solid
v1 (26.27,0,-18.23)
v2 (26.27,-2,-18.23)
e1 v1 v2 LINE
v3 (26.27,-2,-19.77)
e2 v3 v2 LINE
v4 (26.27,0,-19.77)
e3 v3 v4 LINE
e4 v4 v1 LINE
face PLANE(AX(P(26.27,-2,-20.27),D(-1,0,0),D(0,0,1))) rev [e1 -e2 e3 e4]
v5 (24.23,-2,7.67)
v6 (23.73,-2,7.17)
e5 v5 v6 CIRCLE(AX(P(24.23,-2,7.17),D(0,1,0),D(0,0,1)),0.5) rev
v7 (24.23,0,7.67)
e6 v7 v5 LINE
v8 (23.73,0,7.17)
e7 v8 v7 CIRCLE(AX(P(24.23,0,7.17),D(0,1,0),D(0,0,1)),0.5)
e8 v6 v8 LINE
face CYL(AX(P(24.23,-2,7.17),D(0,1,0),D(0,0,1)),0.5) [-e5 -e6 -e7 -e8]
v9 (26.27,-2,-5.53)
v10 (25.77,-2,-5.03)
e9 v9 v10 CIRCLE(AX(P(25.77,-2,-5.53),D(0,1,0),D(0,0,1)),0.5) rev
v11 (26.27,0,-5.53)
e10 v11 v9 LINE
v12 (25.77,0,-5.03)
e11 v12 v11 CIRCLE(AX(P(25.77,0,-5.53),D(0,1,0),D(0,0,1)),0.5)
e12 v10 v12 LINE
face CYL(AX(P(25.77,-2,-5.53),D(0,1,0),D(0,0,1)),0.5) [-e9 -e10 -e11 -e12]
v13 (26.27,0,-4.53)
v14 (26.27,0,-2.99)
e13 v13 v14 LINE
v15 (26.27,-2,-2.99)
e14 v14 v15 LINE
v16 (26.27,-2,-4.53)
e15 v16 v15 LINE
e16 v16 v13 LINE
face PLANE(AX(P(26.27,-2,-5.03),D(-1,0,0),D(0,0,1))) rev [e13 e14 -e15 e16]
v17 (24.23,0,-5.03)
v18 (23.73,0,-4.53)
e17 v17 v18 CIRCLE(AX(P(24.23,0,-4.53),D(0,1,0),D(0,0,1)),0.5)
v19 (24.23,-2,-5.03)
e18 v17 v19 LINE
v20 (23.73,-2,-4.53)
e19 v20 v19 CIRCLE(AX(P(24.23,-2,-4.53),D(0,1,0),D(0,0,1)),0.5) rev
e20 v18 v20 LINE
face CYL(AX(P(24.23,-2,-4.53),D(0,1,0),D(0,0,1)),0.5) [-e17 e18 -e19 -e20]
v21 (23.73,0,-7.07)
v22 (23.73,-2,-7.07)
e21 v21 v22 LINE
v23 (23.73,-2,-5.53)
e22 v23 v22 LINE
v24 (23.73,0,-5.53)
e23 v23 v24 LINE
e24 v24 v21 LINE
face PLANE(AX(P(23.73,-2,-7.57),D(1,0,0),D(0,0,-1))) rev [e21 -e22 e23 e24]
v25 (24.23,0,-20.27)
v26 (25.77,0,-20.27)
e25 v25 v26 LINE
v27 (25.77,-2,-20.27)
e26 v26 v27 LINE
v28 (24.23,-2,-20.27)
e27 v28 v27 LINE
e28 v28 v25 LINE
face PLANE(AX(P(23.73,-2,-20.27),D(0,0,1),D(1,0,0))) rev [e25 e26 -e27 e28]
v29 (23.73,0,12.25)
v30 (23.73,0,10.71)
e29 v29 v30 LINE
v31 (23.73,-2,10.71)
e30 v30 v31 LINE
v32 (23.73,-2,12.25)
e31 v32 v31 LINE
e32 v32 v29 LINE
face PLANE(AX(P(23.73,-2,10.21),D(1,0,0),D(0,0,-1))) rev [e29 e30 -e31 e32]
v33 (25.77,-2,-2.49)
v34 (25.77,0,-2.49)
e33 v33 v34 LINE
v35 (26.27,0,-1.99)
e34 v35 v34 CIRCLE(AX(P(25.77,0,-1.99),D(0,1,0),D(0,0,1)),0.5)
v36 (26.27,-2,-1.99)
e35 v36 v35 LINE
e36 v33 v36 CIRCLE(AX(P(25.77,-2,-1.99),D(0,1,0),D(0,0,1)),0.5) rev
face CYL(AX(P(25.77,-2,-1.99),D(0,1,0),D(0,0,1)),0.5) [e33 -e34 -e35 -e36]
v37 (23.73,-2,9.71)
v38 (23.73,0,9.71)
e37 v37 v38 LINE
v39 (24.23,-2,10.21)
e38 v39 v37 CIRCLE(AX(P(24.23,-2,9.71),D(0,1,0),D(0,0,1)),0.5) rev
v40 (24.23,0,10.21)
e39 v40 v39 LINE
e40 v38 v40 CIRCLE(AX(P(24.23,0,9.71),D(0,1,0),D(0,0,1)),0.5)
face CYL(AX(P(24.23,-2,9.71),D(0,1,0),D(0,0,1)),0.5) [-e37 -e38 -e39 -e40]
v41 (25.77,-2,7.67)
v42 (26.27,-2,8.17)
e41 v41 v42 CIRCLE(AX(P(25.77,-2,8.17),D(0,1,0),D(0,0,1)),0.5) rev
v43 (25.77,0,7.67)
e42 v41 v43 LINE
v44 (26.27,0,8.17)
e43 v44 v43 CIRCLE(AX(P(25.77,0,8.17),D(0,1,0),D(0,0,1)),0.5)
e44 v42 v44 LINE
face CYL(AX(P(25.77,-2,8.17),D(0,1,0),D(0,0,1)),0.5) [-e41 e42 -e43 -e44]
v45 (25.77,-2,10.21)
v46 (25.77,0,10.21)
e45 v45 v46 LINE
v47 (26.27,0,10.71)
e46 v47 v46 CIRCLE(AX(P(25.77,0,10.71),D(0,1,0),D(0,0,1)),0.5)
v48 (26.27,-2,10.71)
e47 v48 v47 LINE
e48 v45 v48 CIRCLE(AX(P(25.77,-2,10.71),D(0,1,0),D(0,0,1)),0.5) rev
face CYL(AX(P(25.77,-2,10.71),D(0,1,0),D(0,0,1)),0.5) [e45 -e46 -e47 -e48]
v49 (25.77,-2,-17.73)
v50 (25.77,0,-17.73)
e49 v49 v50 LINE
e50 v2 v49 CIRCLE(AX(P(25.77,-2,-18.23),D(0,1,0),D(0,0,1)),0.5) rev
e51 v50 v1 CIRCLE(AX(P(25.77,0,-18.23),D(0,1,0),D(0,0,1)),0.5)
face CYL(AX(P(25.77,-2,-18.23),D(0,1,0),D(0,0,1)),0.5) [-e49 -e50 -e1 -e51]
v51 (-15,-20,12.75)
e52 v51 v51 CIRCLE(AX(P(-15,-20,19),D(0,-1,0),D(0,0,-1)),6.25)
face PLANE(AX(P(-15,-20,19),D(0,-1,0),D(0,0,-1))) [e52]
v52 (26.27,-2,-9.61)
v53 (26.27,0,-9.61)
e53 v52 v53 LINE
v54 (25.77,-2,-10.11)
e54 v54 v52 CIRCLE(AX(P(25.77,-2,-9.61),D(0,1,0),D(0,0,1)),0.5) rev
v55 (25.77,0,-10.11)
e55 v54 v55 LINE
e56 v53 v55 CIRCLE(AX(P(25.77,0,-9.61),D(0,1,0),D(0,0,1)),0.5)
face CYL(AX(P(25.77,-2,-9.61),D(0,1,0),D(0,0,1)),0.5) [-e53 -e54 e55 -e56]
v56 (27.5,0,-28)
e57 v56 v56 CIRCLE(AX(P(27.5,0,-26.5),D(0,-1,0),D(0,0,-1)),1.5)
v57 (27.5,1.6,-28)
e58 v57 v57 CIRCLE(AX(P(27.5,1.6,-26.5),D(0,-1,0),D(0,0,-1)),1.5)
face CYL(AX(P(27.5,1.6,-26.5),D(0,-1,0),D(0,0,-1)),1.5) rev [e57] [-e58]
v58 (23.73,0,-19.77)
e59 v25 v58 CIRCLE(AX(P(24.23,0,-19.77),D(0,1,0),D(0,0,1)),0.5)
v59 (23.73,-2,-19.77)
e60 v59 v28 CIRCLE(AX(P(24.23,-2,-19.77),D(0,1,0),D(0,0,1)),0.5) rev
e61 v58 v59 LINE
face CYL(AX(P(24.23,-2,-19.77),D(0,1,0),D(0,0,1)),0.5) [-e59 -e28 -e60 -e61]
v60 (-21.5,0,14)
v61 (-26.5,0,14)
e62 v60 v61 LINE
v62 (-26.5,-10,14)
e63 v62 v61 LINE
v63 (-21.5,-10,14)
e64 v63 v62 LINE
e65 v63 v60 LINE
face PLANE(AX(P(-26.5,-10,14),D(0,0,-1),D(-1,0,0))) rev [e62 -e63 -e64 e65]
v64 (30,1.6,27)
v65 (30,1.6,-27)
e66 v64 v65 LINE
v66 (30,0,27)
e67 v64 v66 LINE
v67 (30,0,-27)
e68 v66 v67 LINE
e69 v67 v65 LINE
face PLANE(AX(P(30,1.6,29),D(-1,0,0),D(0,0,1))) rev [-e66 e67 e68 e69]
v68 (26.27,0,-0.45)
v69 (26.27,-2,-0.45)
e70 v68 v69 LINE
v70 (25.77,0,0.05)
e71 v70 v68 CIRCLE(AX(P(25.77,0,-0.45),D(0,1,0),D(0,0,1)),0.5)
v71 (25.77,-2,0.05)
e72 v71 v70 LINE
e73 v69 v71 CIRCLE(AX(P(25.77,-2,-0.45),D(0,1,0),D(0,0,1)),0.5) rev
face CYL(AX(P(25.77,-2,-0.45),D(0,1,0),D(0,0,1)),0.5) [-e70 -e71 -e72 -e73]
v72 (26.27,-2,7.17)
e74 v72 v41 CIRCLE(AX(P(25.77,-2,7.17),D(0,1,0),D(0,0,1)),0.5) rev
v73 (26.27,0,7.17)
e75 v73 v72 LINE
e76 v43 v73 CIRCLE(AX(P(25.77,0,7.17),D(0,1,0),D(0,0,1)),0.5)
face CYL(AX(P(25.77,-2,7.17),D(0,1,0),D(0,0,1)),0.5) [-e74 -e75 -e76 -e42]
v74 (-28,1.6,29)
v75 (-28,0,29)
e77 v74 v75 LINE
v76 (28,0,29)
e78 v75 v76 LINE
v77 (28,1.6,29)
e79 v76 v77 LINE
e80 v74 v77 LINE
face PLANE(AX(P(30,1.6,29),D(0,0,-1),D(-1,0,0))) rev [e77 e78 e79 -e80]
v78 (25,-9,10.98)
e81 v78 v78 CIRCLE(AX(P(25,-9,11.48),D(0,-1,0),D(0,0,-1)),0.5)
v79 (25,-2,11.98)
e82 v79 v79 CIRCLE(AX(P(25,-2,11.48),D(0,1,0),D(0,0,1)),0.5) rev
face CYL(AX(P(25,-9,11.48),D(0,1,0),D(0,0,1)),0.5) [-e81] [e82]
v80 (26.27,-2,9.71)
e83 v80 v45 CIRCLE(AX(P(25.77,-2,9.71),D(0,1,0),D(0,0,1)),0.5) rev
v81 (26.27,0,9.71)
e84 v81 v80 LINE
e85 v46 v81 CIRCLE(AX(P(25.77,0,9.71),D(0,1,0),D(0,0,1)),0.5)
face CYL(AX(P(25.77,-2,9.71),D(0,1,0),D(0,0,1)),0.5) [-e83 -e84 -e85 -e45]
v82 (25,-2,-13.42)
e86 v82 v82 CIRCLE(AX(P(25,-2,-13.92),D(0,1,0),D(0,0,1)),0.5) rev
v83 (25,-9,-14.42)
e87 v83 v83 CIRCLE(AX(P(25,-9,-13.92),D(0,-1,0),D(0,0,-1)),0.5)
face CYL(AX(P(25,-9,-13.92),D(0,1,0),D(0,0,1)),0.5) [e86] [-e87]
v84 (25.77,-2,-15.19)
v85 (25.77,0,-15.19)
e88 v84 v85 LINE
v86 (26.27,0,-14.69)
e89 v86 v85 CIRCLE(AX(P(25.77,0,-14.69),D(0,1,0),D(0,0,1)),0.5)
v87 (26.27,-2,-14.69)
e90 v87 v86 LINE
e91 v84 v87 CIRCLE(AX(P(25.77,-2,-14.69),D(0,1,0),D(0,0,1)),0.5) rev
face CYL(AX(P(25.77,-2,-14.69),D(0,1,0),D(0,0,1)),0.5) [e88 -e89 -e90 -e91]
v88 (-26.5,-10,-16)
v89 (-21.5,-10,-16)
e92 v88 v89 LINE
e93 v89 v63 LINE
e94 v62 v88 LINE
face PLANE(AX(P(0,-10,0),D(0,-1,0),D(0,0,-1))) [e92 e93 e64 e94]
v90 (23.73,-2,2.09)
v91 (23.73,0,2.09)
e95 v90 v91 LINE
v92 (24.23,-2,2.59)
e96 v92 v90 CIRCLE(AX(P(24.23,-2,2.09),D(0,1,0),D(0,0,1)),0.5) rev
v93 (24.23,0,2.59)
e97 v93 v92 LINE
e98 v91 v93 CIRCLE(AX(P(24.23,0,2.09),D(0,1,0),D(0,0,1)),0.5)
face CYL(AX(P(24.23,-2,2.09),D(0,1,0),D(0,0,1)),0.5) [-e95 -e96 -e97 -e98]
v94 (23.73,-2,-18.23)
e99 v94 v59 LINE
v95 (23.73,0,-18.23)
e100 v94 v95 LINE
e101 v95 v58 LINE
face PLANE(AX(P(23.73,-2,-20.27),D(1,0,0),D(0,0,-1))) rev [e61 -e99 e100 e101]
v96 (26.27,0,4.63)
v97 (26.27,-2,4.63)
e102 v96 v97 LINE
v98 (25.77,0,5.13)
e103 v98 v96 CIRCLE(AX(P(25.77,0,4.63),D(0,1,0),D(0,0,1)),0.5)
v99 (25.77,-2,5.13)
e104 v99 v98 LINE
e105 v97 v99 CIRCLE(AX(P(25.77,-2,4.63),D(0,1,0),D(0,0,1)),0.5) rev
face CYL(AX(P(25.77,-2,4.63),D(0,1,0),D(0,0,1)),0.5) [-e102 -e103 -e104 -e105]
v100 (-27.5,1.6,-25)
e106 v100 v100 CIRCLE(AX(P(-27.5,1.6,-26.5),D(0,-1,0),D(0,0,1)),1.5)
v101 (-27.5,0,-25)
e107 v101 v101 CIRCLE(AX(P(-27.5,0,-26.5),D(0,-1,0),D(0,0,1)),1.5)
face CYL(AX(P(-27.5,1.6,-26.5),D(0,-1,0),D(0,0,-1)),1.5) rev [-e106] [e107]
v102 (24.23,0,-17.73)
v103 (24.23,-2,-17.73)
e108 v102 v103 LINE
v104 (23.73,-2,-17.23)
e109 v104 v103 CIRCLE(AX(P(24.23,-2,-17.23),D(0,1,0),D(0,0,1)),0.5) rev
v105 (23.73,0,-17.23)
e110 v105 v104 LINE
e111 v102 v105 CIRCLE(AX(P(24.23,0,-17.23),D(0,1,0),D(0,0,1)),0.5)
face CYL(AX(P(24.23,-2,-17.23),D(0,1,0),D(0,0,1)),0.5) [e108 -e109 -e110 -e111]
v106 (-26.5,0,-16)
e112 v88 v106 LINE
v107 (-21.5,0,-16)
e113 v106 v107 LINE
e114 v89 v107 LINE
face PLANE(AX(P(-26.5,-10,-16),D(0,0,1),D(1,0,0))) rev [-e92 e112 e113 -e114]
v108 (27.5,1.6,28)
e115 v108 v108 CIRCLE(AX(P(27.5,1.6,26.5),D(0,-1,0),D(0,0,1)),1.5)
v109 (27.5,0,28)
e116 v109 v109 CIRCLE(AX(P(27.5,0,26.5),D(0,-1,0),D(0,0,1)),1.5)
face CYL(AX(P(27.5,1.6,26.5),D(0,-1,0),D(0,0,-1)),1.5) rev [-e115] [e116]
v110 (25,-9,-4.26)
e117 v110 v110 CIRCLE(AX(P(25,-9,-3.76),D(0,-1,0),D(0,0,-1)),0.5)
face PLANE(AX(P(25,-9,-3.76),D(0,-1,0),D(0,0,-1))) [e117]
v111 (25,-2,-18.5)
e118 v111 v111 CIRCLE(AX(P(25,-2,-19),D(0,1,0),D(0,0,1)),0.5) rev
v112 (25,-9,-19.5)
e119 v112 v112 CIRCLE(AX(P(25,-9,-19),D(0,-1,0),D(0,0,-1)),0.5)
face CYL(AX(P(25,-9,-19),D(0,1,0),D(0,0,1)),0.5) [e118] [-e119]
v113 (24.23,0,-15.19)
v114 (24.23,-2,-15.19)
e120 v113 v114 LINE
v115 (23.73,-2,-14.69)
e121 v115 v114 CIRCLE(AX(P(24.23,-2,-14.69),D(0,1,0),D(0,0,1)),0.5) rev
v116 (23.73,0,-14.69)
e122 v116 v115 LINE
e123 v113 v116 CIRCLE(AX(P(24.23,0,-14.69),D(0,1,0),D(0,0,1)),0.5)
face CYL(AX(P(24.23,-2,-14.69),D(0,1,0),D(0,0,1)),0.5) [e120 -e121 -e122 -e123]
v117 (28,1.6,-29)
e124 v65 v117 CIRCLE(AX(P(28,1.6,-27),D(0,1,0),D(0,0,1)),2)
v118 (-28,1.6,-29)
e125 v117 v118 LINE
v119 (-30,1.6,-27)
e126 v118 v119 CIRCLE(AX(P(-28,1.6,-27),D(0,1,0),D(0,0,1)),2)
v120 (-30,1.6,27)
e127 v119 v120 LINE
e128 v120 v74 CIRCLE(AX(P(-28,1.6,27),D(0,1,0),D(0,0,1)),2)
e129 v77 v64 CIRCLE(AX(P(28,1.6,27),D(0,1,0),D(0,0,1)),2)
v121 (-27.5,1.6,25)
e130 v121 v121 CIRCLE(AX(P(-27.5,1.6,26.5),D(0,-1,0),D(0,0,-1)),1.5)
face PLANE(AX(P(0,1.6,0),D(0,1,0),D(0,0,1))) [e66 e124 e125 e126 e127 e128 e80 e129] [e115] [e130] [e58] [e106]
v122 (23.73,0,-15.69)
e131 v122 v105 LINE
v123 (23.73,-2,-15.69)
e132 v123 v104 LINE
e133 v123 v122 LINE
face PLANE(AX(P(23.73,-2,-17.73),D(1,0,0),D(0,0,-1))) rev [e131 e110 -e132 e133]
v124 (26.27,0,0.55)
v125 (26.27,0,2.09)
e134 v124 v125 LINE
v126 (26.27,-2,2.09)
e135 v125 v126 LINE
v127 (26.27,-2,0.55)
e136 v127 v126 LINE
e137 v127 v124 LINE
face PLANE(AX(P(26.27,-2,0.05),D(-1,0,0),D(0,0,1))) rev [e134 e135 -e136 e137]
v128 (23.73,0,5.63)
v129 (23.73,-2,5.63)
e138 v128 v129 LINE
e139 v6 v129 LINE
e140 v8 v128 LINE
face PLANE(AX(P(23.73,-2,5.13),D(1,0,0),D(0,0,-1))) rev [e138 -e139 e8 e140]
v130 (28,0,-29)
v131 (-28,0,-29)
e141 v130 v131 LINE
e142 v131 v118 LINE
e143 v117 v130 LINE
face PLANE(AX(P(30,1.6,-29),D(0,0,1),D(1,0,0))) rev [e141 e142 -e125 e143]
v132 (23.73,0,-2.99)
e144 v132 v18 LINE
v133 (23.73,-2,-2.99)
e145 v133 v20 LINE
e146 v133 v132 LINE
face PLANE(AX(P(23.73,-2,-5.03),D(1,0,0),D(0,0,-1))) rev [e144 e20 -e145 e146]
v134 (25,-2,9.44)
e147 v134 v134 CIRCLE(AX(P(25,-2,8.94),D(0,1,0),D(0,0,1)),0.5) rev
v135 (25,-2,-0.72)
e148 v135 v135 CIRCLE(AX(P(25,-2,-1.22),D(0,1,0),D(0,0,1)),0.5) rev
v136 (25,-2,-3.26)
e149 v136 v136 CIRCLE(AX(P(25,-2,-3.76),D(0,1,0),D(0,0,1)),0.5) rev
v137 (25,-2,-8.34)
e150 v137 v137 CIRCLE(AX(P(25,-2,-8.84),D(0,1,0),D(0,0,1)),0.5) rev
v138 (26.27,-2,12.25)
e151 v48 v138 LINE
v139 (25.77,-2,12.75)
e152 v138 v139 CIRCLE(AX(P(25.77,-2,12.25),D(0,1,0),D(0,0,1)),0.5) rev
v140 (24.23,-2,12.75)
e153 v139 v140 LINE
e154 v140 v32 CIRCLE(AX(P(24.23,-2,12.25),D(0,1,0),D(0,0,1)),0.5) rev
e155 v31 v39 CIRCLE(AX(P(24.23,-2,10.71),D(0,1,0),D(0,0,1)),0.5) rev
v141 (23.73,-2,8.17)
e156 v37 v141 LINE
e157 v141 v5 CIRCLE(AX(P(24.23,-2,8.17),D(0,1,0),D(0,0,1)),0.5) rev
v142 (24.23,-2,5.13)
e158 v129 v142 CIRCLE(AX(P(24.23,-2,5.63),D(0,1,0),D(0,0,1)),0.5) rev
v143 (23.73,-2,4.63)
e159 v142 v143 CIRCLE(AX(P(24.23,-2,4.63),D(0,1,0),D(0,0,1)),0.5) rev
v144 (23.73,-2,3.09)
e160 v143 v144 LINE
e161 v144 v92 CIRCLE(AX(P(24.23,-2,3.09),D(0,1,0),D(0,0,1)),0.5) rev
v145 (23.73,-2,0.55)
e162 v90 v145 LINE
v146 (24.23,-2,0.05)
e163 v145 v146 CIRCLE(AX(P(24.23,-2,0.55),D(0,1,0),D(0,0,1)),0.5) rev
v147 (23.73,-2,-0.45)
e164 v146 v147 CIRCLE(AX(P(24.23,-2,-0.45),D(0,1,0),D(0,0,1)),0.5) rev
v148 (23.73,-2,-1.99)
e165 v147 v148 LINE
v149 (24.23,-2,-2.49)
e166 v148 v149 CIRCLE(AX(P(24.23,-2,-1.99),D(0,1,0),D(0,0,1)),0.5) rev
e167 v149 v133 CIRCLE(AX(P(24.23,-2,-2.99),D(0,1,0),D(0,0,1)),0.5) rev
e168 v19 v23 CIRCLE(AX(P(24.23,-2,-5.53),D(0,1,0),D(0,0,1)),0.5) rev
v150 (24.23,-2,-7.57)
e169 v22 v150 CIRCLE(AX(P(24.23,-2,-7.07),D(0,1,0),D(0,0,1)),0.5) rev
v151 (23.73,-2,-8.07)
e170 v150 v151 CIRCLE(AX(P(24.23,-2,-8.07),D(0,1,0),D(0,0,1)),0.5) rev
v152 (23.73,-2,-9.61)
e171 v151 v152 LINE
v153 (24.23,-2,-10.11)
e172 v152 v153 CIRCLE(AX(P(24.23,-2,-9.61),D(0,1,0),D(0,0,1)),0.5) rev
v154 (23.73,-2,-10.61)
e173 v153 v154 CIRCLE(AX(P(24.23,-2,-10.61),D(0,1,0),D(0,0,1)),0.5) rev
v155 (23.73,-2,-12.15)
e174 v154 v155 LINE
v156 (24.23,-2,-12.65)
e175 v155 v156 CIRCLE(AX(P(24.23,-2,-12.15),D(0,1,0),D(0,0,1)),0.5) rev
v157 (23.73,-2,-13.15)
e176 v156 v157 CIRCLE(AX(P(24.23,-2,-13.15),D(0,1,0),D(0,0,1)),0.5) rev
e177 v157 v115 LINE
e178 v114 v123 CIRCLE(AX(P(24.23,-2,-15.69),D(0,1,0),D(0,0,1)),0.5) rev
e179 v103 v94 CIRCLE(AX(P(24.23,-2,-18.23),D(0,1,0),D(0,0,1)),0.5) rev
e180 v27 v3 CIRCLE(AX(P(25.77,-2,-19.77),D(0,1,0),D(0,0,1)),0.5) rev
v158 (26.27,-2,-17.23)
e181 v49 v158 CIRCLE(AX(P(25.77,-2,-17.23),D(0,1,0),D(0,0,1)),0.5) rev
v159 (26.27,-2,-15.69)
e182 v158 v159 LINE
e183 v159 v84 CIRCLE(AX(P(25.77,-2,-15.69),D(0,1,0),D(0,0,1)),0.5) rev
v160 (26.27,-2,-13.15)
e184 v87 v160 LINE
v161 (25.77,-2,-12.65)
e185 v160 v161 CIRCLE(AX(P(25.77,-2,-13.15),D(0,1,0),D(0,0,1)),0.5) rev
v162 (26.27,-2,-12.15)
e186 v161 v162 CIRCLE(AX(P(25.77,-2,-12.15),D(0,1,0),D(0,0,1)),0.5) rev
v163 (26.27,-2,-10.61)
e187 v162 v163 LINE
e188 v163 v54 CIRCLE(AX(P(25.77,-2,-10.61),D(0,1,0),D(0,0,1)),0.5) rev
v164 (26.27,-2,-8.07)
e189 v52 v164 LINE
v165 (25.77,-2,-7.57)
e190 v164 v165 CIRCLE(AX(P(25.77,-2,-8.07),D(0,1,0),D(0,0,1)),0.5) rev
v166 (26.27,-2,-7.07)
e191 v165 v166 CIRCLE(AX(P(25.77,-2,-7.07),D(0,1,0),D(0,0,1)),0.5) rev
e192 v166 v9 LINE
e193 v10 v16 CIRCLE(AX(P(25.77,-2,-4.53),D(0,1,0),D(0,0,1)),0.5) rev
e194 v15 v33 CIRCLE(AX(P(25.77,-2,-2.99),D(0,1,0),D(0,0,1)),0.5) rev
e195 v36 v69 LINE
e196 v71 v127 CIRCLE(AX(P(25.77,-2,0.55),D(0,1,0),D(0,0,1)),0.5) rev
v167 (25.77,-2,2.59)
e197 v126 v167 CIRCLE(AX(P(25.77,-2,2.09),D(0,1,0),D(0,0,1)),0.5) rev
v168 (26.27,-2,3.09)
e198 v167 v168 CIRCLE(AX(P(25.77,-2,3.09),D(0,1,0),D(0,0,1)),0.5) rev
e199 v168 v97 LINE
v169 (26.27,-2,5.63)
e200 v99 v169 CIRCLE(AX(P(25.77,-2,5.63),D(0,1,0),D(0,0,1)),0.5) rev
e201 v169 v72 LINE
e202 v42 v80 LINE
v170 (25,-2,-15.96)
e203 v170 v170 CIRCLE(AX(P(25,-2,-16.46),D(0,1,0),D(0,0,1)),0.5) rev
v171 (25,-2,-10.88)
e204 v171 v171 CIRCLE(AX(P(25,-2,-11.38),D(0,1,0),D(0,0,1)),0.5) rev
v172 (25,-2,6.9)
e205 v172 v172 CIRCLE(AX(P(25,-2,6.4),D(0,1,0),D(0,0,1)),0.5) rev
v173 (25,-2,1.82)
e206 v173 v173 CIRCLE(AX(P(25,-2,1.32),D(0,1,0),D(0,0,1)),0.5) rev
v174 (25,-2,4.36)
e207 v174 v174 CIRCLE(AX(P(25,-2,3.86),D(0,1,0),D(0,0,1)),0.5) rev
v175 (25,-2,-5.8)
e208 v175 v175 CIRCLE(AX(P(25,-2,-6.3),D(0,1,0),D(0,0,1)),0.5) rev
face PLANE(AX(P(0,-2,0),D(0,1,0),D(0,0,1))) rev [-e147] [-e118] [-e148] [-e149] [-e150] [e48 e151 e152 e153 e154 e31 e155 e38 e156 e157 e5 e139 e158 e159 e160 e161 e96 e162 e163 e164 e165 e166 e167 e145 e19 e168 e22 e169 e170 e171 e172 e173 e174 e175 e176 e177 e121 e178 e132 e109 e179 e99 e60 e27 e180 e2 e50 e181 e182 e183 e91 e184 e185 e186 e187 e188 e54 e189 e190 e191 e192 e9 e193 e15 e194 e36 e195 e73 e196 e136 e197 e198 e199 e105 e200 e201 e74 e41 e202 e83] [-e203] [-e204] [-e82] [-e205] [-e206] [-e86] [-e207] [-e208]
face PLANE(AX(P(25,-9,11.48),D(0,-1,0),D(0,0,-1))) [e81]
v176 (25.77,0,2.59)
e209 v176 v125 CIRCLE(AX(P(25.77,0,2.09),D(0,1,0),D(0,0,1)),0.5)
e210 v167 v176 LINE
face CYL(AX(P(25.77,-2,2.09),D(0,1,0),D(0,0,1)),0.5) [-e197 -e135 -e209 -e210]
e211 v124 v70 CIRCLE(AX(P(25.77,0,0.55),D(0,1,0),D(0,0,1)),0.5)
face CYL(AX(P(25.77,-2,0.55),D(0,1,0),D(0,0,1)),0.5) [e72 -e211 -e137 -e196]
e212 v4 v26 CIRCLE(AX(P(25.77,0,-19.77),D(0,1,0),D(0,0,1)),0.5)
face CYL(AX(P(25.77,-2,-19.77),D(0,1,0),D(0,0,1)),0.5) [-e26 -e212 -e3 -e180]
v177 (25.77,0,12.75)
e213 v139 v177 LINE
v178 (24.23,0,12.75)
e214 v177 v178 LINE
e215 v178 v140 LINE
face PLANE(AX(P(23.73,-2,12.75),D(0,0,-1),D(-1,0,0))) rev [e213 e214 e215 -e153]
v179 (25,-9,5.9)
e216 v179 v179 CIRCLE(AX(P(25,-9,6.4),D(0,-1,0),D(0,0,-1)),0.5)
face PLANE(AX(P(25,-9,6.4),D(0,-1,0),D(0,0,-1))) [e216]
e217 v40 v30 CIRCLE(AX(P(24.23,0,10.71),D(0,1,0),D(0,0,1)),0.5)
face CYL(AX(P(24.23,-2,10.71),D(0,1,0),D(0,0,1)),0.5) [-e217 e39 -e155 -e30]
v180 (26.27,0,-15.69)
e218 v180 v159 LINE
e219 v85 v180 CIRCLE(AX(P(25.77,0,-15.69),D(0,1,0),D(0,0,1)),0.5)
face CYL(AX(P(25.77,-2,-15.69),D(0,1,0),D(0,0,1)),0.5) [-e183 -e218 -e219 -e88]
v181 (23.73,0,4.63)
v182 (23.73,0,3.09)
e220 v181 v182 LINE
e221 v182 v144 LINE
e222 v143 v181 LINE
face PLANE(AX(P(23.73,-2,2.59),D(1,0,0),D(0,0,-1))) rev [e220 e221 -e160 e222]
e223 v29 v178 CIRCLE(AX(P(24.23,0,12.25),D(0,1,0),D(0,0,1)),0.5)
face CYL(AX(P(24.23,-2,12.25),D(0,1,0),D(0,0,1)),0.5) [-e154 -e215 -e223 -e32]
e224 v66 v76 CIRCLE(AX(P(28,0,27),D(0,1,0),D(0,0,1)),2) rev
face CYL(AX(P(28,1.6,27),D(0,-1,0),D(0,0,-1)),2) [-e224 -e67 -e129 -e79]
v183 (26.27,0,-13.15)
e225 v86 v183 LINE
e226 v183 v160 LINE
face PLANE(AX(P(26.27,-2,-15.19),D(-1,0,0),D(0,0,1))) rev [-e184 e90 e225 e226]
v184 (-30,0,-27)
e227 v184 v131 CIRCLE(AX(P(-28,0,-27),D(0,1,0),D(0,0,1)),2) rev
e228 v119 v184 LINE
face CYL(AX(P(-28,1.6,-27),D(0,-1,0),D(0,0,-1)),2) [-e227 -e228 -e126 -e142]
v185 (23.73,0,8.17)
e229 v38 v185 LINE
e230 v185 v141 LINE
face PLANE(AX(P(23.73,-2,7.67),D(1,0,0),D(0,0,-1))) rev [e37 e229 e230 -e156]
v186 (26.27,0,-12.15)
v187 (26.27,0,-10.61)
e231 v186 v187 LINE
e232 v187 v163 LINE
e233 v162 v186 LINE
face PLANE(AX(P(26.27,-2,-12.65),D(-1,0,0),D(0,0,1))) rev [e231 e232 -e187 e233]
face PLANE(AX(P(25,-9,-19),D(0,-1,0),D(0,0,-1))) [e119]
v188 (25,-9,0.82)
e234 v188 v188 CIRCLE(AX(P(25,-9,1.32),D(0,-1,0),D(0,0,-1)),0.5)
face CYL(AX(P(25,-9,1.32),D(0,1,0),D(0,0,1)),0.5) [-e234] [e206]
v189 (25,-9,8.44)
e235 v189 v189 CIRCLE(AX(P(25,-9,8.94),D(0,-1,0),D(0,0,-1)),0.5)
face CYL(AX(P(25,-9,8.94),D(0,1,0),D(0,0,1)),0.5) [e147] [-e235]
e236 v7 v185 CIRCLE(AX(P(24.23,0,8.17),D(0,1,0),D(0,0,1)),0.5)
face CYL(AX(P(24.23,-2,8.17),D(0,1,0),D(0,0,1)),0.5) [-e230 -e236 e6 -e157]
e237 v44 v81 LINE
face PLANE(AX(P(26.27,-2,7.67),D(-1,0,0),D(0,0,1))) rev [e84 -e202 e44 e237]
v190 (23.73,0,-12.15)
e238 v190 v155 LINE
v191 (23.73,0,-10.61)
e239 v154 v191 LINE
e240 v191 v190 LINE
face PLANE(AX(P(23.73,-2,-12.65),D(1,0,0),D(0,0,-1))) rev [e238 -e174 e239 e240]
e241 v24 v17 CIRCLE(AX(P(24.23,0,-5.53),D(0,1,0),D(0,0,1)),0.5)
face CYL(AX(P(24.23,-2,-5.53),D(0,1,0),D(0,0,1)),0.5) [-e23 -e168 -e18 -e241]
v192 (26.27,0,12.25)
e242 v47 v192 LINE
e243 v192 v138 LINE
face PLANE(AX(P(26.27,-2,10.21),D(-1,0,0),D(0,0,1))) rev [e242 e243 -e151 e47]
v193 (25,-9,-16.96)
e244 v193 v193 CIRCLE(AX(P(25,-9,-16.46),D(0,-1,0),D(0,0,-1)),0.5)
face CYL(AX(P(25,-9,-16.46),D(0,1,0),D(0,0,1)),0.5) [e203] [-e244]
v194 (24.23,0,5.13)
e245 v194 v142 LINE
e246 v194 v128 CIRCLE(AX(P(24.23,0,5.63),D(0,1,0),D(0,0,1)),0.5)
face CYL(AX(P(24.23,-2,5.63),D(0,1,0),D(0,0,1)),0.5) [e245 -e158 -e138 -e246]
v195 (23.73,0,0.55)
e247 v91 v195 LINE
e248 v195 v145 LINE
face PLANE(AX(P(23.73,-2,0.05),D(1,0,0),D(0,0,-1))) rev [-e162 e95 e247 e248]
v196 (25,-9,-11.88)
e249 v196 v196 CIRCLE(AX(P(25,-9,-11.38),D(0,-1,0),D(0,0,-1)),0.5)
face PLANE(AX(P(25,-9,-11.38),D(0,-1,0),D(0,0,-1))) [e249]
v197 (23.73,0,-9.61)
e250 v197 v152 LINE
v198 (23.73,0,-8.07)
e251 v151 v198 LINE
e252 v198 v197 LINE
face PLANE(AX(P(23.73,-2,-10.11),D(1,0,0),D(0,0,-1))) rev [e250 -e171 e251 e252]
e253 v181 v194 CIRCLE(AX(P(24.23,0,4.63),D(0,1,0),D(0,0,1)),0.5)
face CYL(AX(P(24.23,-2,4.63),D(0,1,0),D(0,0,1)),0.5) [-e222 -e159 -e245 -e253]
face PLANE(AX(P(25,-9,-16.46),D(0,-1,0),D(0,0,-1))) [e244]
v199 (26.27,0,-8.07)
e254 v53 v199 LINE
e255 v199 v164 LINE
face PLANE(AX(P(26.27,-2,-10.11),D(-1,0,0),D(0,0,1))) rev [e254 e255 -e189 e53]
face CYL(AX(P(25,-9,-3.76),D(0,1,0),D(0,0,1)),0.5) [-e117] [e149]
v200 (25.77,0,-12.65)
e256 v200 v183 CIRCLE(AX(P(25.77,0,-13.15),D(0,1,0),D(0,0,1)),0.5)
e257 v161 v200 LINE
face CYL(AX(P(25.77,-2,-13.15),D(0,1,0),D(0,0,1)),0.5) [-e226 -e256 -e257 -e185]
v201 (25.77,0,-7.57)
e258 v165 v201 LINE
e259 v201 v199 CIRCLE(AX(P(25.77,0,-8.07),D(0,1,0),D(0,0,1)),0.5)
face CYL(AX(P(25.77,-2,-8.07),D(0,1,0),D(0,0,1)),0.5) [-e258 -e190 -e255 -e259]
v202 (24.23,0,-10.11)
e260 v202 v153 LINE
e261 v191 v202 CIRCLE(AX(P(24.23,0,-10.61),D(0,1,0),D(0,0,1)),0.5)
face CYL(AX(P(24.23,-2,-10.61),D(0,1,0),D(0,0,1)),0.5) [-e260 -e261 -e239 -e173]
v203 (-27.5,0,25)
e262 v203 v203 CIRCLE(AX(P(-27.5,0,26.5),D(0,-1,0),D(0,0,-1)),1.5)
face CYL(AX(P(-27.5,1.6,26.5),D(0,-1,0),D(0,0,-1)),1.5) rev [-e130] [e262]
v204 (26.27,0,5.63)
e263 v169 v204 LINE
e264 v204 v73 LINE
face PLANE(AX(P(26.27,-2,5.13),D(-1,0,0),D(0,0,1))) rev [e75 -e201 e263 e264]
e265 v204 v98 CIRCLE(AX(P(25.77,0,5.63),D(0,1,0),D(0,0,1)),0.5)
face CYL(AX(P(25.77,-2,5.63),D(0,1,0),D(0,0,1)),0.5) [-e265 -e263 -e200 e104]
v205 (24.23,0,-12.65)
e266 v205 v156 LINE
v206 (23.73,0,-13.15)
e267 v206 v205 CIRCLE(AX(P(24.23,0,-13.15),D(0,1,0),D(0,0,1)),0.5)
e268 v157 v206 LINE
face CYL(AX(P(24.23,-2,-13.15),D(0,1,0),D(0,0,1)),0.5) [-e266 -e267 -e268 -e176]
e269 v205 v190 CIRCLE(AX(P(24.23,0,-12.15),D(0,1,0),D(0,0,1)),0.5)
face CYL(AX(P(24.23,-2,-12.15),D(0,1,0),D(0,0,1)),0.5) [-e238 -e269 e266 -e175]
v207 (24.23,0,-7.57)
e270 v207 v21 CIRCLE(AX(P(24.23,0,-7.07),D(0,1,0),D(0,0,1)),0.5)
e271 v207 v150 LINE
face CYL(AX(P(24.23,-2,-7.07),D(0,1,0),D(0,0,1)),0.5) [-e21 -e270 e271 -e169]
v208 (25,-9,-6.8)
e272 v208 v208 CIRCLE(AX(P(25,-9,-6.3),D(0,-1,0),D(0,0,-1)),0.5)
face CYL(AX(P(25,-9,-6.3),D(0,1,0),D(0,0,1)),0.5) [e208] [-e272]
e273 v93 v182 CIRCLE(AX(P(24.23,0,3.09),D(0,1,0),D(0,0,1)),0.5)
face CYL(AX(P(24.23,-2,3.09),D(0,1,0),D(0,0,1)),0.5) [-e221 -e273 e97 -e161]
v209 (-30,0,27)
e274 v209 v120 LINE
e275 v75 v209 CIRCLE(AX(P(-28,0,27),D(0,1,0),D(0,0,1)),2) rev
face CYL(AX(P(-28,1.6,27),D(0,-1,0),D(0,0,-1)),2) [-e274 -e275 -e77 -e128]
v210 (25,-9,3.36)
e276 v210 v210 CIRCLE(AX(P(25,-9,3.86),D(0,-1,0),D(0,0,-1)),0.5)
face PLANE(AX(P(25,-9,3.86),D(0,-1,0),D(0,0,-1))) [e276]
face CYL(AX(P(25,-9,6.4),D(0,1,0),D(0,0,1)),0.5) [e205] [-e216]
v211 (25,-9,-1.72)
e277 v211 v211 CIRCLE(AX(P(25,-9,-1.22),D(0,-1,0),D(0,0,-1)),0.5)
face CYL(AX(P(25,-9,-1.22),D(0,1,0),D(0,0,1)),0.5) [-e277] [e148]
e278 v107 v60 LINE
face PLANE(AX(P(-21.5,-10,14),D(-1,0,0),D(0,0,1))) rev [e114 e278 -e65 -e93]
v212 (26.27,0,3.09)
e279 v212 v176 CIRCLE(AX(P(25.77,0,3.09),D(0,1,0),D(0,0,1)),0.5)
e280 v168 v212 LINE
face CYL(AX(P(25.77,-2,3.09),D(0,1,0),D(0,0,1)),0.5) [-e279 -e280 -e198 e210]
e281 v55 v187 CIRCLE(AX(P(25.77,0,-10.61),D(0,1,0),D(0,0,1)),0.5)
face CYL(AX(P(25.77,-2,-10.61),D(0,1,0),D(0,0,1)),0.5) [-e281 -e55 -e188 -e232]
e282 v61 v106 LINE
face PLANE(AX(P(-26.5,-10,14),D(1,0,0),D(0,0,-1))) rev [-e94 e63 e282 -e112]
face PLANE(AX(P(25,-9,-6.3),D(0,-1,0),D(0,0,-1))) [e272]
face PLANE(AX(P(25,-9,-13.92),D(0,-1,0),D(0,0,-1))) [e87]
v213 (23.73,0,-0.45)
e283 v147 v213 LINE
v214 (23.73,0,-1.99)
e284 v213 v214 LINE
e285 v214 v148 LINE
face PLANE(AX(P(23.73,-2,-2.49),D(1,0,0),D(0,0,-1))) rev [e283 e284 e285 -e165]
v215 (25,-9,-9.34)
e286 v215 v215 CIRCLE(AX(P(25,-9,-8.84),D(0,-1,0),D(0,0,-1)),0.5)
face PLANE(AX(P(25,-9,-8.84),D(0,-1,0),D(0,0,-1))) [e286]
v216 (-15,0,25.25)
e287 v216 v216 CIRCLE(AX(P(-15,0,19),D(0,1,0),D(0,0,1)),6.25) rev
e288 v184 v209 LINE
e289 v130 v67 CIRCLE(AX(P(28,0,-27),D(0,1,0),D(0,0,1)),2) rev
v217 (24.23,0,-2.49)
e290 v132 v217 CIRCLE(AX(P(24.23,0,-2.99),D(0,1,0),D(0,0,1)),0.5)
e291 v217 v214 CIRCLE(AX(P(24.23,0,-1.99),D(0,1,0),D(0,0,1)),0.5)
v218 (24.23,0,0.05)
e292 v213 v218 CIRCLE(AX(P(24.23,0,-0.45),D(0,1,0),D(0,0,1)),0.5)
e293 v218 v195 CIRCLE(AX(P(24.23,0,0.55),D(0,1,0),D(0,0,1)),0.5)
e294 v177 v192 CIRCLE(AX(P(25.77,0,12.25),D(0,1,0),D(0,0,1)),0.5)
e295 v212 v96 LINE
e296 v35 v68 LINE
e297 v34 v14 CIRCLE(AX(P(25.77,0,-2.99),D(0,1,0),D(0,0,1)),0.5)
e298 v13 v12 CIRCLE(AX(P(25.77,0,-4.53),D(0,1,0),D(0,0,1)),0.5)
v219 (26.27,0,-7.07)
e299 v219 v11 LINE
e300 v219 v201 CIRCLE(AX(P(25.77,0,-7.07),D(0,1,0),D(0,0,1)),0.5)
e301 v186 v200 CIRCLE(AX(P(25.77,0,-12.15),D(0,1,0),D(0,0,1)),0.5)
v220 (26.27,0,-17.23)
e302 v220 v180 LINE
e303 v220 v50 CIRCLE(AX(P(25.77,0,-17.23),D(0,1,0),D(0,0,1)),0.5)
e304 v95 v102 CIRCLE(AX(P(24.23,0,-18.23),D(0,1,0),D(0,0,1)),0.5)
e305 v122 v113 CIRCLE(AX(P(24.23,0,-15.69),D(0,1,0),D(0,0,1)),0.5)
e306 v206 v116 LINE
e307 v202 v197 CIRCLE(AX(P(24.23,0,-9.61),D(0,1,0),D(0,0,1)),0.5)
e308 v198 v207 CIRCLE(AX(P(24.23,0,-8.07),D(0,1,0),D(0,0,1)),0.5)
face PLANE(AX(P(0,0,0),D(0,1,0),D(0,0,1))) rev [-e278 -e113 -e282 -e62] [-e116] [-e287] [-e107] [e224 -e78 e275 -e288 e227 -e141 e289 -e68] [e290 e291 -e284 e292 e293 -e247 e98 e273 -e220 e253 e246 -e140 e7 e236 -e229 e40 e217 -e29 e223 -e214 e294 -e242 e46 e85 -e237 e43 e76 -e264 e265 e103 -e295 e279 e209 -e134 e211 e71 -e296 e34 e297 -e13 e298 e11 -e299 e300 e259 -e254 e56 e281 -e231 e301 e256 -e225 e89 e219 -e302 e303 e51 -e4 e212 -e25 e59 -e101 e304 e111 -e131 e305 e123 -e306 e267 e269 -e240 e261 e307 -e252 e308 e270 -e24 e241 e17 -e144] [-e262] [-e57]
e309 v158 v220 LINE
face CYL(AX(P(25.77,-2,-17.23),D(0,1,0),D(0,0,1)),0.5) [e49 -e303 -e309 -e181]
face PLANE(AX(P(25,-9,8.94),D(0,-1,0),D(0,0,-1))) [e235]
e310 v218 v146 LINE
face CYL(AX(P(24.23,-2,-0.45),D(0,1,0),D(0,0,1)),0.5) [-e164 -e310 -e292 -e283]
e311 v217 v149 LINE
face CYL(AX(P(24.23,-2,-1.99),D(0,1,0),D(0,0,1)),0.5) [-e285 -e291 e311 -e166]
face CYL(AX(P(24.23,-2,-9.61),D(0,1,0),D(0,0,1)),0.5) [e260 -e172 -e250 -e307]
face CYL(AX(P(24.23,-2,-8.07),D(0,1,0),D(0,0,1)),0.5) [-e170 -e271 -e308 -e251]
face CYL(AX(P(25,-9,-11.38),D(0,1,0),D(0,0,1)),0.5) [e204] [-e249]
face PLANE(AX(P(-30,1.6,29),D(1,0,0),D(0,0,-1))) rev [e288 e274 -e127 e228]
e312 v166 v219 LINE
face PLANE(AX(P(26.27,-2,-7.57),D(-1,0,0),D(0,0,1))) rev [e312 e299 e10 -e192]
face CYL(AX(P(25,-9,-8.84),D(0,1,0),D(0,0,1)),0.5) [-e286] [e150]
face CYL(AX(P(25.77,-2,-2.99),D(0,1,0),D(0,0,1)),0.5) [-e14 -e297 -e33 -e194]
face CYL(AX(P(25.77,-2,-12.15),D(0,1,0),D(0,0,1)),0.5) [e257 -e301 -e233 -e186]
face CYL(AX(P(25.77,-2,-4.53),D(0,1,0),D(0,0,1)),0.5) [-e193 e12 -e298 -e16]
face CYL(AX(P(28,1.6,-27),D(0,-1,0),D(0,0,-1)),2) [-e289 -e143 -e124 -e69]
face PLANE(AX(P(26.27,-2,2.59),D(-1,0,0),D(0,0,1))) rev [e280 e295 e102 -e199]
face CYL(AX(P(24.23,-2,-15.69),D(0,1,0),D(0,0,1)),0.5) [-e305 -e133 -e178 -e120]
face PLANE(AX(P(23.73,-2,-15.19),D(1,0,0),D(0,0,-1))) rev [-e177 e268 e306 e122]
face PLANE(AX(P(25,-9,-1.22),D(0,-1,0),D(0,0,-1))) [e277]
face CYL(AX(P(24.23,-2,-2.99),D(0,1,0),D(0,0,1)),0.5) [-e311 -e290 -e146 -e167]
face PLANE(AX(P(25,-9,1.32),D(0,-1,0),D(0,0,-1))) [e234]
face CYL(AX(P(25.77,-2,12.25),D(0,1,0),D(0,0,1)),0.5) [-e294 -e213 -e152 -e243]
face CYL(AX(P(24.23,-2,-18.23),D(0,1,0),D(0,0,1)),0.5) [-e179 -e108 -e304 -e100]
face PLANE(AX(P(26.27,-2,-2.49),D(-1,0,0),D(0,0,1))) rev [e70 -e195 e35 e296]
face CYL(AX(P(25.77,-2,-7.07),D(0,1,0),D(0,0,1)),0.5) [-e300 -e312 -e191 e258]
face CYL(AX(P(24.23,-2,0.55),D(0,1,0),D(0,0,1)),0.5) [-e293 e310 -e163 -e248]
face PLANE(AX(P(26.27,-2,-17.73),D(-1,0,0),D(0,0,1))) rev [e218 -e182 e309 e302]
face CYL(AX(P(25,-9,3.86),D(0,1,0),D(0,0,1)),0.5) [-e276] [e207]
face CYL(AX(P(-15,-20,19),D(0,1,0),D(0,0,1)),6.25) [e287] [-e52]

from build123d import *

# Parameters (mm, degrees)
SKETCH1_W             = 60
SKETCH1_H             = 58
BOSS_EXTRUDE1_DEPTH   = 1.6
FILLET1_R             = 2
SKETCH2_R             = 1.5
CUT_EXTRUDE1_DEPTH    = 1.6
SKETCH3_R             = 6.25
BOSS_EXTRUDE2_DEPTH   = 20
SKETCH4_W             = 5
SKETCH4_H             = 30
BOSS_EXTRUDE3_DEPTH   = 10
SKETCH5_W             = 2.54
SKETCH5_H             = 2.54
BOSS_EXTRUDE4_DEPTH   = 2
FILLET2_R             = 0.5
SKETCH6_R             = 0.5
BOSS_EXTRUDE5_DEPTH   = 7
LPATTERN1_START       = -2
LPATTERN1_DEPTH       = 2
LPATTERN1_START_2     = -9
LPATTERN1_2_OUTLINE_R = 0.5
LPATTERN1_2_DEPTH     = 7


# Read off the part's stored shape, not the designer's step: LPattern1
with BuildPart() as part:
    # Sketch1 → Boss-Extrude1 (new body)
    with BuildSketch(Plane(origin=(0, 0, 0), x_dir=(1, 0, 0), z_dir=(0, 1, 0))):
        Rectangle(SKETCH1_W, SKETCH1_H)
    extrude(amount=BOSS_EXTRUDE1_DEPTH)

    # Fillet1
    fillet1_edges = [part.edges().sort_by_distance(p)[0] for p in [
        (-30, 0.8, -29),
        (30, 0.8, -29),
        (30, 0.8, 29),
        (-30, 0.8, 29),
    ]]
    fillet(fillet1_edges, radius=FILLET1_R)

    # Sketch2 → Cut-Extrude1 (cut)
    with BuildSketch(Plane.XZ):
        with Locations(Location((-27.5, 26.5, 0), (0, 0, 270))):
            Circle(SKETCH2_R)
        with Locations(Location((-27.5, -26.5, 0), (0, 0, 90))):
            Circle(SKETCH2_R)
        with Locations(Location((27.5, -26.5, 0), (0, 0, 270))):
            Circle(SKETCH2_R)
        with Locations(Location((27.5, 26.5, 0), (0, 0, 90))):
            Circle(SKETCH2_R)
    extrude(amount=-CUT_EXTRUDE1_DEPTH, mode=Mode.SUBTRACT)

    # Sketch3 → Boss-Extrude2 (add)
    with BuildSketch(Plane.XZ):
        with Locations(Location((-15, 19, 0), (0, 0, 90))):
            Circle(SKETCH3_R)
    extrude(amount=BOSS_EXTRUDE2_DEPTH)

    # Sketch4 → Boss-Extrude3 (add)
    with BuildSketch(Plane.XZ):
        with Locations((-24, -1)):
            Rectangle(SKETCH4_W, SKETCH4_H)
    extrude(amount=BOSS_EXTRUDE3_DEPTH)

    # Sketch5 → Boss-Extrude4 (add)
    with BuildSketch(Plane.XZ):
        with Locations((25, -19)):
            Rectangle(SKETCH5_W, SKETCH5_H)
    extrude(amount=BOSS_EXTRUDE4_DEPTH)

    # Fillet2
    fillet2_edges = [part.edges().sort_by_distance(p)[0] for p in [
        (26.27, -1, -20.27),
        (26.27, -1, -17.73),
        (23.73, -1, -17.73),
        (23.73, -1, -20.27),
    ]]
    fillet(fillet2_edges, radius=FILLET2_R)

    # Sketch6 → Boss-Extrude5 (add)
    with BuildSketch(Plane.XZ.offset(2)):
        with Locations(Location((25, -19, 0), (0, 0, 90))):
            Circle(SKETCH6_R)
    extrude(amount=BOSS_EXTRUDE5_DEPTH)

    # LPattern1 outline → LPattern1 (add)
    with BuildSketch(Plane(origin=(0, 0, 0), x_dir=(1, 0, 0), z_dir=(0, 1, 0)).offset(LPATTERN1_START)):
        with BuildLine():
            Line((26.27, 15.69), (26.27, 17.23))
            ThreePointArc((26.27, 17.23), (26.123553391, 17.583553391), (25.77, 17.73))
            Line((25.77, 17.73), (24.23, 17.73))
            ThreePointArc((24.23, 17.73), (23.876446609, 17.583553391), (23.73, 17.23))
            Line((23.73, 17.23), (23.73, 15.69))
            ThreePointArc((23.73, 15.69), (23.876446609, 15.336446609), (24.23, 15.19))
            ThreePointArc((24.23, 15.19), (23.876446609, 15.043553391), (23.73, 14.69))
            Line((23.73, 14.69), (23.73, 13.15))
            ThreePointArc((23.73, 13.15), (23.876446609, 12.796446609), (24.23, 12.65))
            ThreePointArc((24.23, 12.65), (23.876446609, 12.503553391), (23.73, 12.15))
            Line((23.73, 12.15), (23.73, 10.61))
            ThreePointArc((23.73, 10.61), (23.876446609, 10.256446609), (24.23, 10.11))
            ThreePointArc((24.23, 10.11), (23.876446609, 9.963553391), (23.73, 9.61))
            Line((23.73, 9.61), (23.73, 8.07))
            ThreePointArc((23.73, 8.07), (23.876446609, 7.716446609), (24.23, 7.57))
            ThreePointArc((24.23, 7.57), (23.876446609, 7.423553391), (23.73, 7.07))
            Line((23.73, 7.07), (23.73, 5.53))
            ThreePointArc((23.73, 5.53), (23.876446609, 5.176446609), (24.23, 5.03))
            ThreePointArc((24.23, 5.03), (23.876446609, 4.883553391), (23.73, 4.53))
            Line((23.73, 4.53), (23.73, 2.99))
            ThreePointArc((23.73, 2.99), (23.876446609, 2.636446609), (24.23, 2.49))
            ThreePointArc((24.23, 2.49), (23.876446609, 2.343553391), (23.73, 1.99))
            Line((23.73, 1.99), (23.73, 0.45))
            ThreePointArc((23.73, 0.45), (23.876446609, 0.096446609), (24.23, -0.05))
            ThreePointArc((24.23, -0.05), (23.876446609, -0.196446609), (23.73, -0.55))
            Line((23.73, -0.55), (23.73, -2.09))
            ThreePointArc((23.73, -2.09), (23.876446609, -2.443553391), (24.23, -2.59))
            ThreePointArc((24.23, -2.59), (23.876446609, -2.736446609), (23.73, -3.09))
            Line((23.73, -3.09), (23.73, -4.63))
            ThreePointArc((23.73, -4.63), (23.876446609, -4.983553391), (24.23, -5.13))
            ThreePointArc((24.23, -5.13), (23.876446609, -5.276446609), (23.73, -5.63))
            Line((23.73, -5.63), (23.73, -7.17))
            ThreePointArc((23.73, -7.17), (23.876446609, -7.523553391), (24.23, -7.67))
            ThreePointArc((24.23, -7.67), (23.876446609, -7.816446609), (23.73, -8.17))
            Line((23.73, -8.17), (23.73, -9.71))
            ThreePointArc((23.73, -9.71), (23.876446609, -10.063553391), (24.23, -10.21))
            ThreePointArc((24.23, -10.21), (23.876446609, -10.356446609), (23.73, -10.71))
            Line((23.73, -10.71), (23.73, -12.25))
            ThreePointArc((23.73, -12.25), (23.876446609, -12.603553391), (24.23, -12.75))
            Line((24.23, -12.75), (25.77, -12.75))
            ThreePointArc((25.77, -12.75), (26.123553391, -12.603553391), (26.27, -12.25))
            Line((26.27, -12.25), (26.27, -10.71))
            ThreePointArc((26.27, -10.71), (26.123553391, -10.356446609), (25.77, -10.21))
            ThreePointArc((25.77, -10.21), (26.123553391, -10.063553391), (26.27, -9.71))
            Line((26.27, -9.71), (26.27, -8.17))
            ThreePointArc((26.27, -8.17), (26.123553391, -7.816446609), (25.77, -7.67))
            ThreePointArc((25.77, -7.67), (26.123553391, -7.523553391), (26.27, -7.17))
            Line((26.27, -7.17), (26.27, -5.63))
            ThreePointArc((26.27, -5.63), (26.123553391, -5.276446609), (25.77, -5.13))
            ThreePointArc((25.77, -5.13), (26.123553391, -4.983553391), (26.27, -4.63))
            Line((26.27, -4.63), (26.27, -3.09))
            ThreePointArc((26.27, -3.09), (26.123553391, -2.736446609), (25.77, -2.59))
            ThreePointArc((25.77, -2.59), (26.123553391, -2.443553391), (26.27, -2.09))
            Line((26.27, -2.09), (26.27, -0.55))
            ThreePointArc((26.27, -0.55), (26.123553391, -0.196446609), (25.77, -0.05))
            ThreePointArc((25.77, -0.05), (26.123553391, 0.096446609), (26.27, 0.45))
            Line((26.27, 0.45), (26.27, 1.99))
            ThreePointArc((26.27, 1.99), (26.123553391, 2.343553391), (25.77, 2.49))
            ThreePointArc((25.77, 2.49), (26.123553391, 2.636446609), (26.27, 2.99))
            Line((26.27, 2.99), (26.27, 4.53))
            ThreePointArc((26.27, 4.53), (26.123553391, 4.883553391), (25.77, 5.03))
            ThreePointArc((25.77, 5.03), (26.123553391, 5.176446609), (26.27, 5.53))
            Line((26.27, 5.53), (26.27, 7.07))
            ThreePointArc((26.27, 7.07), (26.123553391, 7.423553391), (25.77, 7.57))
            ThreePointArc((25.77, 7.57), (26.123553391, 7.716446609), (26.27, 8.07))
            Line((26.27, 8.07), (26.27, 9.61))
            ThreePointArc((26.27, 9.61), (26.123553391, 9.963553391), (25.77, 10.11))
            ThreePointArc((25.77, 10.11), (26.123553391, 10.256446609), (26.27, 10.61))
            Line((26.27, 10.61), (26.27, 12.15))
            ThreePointArc((26.27, 12.15), (26.123553391, 12.503553391), (25.77, 12.65))
            ThreePointArc((25.77, 12.65), (26.123553391, 12.796446609), (26.27, 13.15))
            Line((26.27, 13.15), (26.27, 14.69))
            ThreePointArc((26.27, 14.69), (26.123553391, 15.043553391), (25.77, 15.19))
            ThreePointArc((25.77, 15.19), (26.123553391, 15.336446609), (26.27, 15.69))
        make_face()
    extrude(amount=LPATTERN1_DEPTH)

    # LPattern1 2 outline → LPattern1 2 (add)
    with BuildSketch(Plane(origin=(0, 0, 0), x_dir=(1, 0, 0), z_dir=(0, 1, 0)).offset(LPATTERN1_START_2)):
        with Locations((25, 16.46)):
            Circle(LPATTERN1_2_OUTLINE_R)
        with Locations((25, 13.92)):
            Circle(LPATTERN1_2_OUTLINE_R)
        with Locations((25, 11.38)):
            Circle(LPATTERN1_2_OUTLINE_R)
        with Locations((25, 8.84)):
            Circle(LPATTERN1_2_OUTLINE_R)
        with Locations((25, 6.3)):
            Circle(LPATTERN1_2_OUTLINE_R)
        with Locations((25, 3.76)):
            Circle(LPATTERN1_2_OUTLINE_R)
        with Locations((25, 1.22)):
            Circle(LPATTERN1_2_OUTLINE_R)
        with Locations((25, -1.32)):
            Circle(LPATTERN1_2_OUTLINE_R)
        with Locations((25, -3.86)):
            Circle(LPATTERN1_2_OUTLINE_R)
        with Locations((25, -6.4)):
            Circle(LPATTERN1_2_OUTLINE_R)
        with Locations((25, -8.94)):
            Circle(LPATTERN1_2_OUTLINE_R)
        with Locations((25, -11.48)):
            Circle(LPATTERN1_2_OUTLINE_R)
    extrude(amount=LPATTERN1_2_DEPTH)


solid = part.part
